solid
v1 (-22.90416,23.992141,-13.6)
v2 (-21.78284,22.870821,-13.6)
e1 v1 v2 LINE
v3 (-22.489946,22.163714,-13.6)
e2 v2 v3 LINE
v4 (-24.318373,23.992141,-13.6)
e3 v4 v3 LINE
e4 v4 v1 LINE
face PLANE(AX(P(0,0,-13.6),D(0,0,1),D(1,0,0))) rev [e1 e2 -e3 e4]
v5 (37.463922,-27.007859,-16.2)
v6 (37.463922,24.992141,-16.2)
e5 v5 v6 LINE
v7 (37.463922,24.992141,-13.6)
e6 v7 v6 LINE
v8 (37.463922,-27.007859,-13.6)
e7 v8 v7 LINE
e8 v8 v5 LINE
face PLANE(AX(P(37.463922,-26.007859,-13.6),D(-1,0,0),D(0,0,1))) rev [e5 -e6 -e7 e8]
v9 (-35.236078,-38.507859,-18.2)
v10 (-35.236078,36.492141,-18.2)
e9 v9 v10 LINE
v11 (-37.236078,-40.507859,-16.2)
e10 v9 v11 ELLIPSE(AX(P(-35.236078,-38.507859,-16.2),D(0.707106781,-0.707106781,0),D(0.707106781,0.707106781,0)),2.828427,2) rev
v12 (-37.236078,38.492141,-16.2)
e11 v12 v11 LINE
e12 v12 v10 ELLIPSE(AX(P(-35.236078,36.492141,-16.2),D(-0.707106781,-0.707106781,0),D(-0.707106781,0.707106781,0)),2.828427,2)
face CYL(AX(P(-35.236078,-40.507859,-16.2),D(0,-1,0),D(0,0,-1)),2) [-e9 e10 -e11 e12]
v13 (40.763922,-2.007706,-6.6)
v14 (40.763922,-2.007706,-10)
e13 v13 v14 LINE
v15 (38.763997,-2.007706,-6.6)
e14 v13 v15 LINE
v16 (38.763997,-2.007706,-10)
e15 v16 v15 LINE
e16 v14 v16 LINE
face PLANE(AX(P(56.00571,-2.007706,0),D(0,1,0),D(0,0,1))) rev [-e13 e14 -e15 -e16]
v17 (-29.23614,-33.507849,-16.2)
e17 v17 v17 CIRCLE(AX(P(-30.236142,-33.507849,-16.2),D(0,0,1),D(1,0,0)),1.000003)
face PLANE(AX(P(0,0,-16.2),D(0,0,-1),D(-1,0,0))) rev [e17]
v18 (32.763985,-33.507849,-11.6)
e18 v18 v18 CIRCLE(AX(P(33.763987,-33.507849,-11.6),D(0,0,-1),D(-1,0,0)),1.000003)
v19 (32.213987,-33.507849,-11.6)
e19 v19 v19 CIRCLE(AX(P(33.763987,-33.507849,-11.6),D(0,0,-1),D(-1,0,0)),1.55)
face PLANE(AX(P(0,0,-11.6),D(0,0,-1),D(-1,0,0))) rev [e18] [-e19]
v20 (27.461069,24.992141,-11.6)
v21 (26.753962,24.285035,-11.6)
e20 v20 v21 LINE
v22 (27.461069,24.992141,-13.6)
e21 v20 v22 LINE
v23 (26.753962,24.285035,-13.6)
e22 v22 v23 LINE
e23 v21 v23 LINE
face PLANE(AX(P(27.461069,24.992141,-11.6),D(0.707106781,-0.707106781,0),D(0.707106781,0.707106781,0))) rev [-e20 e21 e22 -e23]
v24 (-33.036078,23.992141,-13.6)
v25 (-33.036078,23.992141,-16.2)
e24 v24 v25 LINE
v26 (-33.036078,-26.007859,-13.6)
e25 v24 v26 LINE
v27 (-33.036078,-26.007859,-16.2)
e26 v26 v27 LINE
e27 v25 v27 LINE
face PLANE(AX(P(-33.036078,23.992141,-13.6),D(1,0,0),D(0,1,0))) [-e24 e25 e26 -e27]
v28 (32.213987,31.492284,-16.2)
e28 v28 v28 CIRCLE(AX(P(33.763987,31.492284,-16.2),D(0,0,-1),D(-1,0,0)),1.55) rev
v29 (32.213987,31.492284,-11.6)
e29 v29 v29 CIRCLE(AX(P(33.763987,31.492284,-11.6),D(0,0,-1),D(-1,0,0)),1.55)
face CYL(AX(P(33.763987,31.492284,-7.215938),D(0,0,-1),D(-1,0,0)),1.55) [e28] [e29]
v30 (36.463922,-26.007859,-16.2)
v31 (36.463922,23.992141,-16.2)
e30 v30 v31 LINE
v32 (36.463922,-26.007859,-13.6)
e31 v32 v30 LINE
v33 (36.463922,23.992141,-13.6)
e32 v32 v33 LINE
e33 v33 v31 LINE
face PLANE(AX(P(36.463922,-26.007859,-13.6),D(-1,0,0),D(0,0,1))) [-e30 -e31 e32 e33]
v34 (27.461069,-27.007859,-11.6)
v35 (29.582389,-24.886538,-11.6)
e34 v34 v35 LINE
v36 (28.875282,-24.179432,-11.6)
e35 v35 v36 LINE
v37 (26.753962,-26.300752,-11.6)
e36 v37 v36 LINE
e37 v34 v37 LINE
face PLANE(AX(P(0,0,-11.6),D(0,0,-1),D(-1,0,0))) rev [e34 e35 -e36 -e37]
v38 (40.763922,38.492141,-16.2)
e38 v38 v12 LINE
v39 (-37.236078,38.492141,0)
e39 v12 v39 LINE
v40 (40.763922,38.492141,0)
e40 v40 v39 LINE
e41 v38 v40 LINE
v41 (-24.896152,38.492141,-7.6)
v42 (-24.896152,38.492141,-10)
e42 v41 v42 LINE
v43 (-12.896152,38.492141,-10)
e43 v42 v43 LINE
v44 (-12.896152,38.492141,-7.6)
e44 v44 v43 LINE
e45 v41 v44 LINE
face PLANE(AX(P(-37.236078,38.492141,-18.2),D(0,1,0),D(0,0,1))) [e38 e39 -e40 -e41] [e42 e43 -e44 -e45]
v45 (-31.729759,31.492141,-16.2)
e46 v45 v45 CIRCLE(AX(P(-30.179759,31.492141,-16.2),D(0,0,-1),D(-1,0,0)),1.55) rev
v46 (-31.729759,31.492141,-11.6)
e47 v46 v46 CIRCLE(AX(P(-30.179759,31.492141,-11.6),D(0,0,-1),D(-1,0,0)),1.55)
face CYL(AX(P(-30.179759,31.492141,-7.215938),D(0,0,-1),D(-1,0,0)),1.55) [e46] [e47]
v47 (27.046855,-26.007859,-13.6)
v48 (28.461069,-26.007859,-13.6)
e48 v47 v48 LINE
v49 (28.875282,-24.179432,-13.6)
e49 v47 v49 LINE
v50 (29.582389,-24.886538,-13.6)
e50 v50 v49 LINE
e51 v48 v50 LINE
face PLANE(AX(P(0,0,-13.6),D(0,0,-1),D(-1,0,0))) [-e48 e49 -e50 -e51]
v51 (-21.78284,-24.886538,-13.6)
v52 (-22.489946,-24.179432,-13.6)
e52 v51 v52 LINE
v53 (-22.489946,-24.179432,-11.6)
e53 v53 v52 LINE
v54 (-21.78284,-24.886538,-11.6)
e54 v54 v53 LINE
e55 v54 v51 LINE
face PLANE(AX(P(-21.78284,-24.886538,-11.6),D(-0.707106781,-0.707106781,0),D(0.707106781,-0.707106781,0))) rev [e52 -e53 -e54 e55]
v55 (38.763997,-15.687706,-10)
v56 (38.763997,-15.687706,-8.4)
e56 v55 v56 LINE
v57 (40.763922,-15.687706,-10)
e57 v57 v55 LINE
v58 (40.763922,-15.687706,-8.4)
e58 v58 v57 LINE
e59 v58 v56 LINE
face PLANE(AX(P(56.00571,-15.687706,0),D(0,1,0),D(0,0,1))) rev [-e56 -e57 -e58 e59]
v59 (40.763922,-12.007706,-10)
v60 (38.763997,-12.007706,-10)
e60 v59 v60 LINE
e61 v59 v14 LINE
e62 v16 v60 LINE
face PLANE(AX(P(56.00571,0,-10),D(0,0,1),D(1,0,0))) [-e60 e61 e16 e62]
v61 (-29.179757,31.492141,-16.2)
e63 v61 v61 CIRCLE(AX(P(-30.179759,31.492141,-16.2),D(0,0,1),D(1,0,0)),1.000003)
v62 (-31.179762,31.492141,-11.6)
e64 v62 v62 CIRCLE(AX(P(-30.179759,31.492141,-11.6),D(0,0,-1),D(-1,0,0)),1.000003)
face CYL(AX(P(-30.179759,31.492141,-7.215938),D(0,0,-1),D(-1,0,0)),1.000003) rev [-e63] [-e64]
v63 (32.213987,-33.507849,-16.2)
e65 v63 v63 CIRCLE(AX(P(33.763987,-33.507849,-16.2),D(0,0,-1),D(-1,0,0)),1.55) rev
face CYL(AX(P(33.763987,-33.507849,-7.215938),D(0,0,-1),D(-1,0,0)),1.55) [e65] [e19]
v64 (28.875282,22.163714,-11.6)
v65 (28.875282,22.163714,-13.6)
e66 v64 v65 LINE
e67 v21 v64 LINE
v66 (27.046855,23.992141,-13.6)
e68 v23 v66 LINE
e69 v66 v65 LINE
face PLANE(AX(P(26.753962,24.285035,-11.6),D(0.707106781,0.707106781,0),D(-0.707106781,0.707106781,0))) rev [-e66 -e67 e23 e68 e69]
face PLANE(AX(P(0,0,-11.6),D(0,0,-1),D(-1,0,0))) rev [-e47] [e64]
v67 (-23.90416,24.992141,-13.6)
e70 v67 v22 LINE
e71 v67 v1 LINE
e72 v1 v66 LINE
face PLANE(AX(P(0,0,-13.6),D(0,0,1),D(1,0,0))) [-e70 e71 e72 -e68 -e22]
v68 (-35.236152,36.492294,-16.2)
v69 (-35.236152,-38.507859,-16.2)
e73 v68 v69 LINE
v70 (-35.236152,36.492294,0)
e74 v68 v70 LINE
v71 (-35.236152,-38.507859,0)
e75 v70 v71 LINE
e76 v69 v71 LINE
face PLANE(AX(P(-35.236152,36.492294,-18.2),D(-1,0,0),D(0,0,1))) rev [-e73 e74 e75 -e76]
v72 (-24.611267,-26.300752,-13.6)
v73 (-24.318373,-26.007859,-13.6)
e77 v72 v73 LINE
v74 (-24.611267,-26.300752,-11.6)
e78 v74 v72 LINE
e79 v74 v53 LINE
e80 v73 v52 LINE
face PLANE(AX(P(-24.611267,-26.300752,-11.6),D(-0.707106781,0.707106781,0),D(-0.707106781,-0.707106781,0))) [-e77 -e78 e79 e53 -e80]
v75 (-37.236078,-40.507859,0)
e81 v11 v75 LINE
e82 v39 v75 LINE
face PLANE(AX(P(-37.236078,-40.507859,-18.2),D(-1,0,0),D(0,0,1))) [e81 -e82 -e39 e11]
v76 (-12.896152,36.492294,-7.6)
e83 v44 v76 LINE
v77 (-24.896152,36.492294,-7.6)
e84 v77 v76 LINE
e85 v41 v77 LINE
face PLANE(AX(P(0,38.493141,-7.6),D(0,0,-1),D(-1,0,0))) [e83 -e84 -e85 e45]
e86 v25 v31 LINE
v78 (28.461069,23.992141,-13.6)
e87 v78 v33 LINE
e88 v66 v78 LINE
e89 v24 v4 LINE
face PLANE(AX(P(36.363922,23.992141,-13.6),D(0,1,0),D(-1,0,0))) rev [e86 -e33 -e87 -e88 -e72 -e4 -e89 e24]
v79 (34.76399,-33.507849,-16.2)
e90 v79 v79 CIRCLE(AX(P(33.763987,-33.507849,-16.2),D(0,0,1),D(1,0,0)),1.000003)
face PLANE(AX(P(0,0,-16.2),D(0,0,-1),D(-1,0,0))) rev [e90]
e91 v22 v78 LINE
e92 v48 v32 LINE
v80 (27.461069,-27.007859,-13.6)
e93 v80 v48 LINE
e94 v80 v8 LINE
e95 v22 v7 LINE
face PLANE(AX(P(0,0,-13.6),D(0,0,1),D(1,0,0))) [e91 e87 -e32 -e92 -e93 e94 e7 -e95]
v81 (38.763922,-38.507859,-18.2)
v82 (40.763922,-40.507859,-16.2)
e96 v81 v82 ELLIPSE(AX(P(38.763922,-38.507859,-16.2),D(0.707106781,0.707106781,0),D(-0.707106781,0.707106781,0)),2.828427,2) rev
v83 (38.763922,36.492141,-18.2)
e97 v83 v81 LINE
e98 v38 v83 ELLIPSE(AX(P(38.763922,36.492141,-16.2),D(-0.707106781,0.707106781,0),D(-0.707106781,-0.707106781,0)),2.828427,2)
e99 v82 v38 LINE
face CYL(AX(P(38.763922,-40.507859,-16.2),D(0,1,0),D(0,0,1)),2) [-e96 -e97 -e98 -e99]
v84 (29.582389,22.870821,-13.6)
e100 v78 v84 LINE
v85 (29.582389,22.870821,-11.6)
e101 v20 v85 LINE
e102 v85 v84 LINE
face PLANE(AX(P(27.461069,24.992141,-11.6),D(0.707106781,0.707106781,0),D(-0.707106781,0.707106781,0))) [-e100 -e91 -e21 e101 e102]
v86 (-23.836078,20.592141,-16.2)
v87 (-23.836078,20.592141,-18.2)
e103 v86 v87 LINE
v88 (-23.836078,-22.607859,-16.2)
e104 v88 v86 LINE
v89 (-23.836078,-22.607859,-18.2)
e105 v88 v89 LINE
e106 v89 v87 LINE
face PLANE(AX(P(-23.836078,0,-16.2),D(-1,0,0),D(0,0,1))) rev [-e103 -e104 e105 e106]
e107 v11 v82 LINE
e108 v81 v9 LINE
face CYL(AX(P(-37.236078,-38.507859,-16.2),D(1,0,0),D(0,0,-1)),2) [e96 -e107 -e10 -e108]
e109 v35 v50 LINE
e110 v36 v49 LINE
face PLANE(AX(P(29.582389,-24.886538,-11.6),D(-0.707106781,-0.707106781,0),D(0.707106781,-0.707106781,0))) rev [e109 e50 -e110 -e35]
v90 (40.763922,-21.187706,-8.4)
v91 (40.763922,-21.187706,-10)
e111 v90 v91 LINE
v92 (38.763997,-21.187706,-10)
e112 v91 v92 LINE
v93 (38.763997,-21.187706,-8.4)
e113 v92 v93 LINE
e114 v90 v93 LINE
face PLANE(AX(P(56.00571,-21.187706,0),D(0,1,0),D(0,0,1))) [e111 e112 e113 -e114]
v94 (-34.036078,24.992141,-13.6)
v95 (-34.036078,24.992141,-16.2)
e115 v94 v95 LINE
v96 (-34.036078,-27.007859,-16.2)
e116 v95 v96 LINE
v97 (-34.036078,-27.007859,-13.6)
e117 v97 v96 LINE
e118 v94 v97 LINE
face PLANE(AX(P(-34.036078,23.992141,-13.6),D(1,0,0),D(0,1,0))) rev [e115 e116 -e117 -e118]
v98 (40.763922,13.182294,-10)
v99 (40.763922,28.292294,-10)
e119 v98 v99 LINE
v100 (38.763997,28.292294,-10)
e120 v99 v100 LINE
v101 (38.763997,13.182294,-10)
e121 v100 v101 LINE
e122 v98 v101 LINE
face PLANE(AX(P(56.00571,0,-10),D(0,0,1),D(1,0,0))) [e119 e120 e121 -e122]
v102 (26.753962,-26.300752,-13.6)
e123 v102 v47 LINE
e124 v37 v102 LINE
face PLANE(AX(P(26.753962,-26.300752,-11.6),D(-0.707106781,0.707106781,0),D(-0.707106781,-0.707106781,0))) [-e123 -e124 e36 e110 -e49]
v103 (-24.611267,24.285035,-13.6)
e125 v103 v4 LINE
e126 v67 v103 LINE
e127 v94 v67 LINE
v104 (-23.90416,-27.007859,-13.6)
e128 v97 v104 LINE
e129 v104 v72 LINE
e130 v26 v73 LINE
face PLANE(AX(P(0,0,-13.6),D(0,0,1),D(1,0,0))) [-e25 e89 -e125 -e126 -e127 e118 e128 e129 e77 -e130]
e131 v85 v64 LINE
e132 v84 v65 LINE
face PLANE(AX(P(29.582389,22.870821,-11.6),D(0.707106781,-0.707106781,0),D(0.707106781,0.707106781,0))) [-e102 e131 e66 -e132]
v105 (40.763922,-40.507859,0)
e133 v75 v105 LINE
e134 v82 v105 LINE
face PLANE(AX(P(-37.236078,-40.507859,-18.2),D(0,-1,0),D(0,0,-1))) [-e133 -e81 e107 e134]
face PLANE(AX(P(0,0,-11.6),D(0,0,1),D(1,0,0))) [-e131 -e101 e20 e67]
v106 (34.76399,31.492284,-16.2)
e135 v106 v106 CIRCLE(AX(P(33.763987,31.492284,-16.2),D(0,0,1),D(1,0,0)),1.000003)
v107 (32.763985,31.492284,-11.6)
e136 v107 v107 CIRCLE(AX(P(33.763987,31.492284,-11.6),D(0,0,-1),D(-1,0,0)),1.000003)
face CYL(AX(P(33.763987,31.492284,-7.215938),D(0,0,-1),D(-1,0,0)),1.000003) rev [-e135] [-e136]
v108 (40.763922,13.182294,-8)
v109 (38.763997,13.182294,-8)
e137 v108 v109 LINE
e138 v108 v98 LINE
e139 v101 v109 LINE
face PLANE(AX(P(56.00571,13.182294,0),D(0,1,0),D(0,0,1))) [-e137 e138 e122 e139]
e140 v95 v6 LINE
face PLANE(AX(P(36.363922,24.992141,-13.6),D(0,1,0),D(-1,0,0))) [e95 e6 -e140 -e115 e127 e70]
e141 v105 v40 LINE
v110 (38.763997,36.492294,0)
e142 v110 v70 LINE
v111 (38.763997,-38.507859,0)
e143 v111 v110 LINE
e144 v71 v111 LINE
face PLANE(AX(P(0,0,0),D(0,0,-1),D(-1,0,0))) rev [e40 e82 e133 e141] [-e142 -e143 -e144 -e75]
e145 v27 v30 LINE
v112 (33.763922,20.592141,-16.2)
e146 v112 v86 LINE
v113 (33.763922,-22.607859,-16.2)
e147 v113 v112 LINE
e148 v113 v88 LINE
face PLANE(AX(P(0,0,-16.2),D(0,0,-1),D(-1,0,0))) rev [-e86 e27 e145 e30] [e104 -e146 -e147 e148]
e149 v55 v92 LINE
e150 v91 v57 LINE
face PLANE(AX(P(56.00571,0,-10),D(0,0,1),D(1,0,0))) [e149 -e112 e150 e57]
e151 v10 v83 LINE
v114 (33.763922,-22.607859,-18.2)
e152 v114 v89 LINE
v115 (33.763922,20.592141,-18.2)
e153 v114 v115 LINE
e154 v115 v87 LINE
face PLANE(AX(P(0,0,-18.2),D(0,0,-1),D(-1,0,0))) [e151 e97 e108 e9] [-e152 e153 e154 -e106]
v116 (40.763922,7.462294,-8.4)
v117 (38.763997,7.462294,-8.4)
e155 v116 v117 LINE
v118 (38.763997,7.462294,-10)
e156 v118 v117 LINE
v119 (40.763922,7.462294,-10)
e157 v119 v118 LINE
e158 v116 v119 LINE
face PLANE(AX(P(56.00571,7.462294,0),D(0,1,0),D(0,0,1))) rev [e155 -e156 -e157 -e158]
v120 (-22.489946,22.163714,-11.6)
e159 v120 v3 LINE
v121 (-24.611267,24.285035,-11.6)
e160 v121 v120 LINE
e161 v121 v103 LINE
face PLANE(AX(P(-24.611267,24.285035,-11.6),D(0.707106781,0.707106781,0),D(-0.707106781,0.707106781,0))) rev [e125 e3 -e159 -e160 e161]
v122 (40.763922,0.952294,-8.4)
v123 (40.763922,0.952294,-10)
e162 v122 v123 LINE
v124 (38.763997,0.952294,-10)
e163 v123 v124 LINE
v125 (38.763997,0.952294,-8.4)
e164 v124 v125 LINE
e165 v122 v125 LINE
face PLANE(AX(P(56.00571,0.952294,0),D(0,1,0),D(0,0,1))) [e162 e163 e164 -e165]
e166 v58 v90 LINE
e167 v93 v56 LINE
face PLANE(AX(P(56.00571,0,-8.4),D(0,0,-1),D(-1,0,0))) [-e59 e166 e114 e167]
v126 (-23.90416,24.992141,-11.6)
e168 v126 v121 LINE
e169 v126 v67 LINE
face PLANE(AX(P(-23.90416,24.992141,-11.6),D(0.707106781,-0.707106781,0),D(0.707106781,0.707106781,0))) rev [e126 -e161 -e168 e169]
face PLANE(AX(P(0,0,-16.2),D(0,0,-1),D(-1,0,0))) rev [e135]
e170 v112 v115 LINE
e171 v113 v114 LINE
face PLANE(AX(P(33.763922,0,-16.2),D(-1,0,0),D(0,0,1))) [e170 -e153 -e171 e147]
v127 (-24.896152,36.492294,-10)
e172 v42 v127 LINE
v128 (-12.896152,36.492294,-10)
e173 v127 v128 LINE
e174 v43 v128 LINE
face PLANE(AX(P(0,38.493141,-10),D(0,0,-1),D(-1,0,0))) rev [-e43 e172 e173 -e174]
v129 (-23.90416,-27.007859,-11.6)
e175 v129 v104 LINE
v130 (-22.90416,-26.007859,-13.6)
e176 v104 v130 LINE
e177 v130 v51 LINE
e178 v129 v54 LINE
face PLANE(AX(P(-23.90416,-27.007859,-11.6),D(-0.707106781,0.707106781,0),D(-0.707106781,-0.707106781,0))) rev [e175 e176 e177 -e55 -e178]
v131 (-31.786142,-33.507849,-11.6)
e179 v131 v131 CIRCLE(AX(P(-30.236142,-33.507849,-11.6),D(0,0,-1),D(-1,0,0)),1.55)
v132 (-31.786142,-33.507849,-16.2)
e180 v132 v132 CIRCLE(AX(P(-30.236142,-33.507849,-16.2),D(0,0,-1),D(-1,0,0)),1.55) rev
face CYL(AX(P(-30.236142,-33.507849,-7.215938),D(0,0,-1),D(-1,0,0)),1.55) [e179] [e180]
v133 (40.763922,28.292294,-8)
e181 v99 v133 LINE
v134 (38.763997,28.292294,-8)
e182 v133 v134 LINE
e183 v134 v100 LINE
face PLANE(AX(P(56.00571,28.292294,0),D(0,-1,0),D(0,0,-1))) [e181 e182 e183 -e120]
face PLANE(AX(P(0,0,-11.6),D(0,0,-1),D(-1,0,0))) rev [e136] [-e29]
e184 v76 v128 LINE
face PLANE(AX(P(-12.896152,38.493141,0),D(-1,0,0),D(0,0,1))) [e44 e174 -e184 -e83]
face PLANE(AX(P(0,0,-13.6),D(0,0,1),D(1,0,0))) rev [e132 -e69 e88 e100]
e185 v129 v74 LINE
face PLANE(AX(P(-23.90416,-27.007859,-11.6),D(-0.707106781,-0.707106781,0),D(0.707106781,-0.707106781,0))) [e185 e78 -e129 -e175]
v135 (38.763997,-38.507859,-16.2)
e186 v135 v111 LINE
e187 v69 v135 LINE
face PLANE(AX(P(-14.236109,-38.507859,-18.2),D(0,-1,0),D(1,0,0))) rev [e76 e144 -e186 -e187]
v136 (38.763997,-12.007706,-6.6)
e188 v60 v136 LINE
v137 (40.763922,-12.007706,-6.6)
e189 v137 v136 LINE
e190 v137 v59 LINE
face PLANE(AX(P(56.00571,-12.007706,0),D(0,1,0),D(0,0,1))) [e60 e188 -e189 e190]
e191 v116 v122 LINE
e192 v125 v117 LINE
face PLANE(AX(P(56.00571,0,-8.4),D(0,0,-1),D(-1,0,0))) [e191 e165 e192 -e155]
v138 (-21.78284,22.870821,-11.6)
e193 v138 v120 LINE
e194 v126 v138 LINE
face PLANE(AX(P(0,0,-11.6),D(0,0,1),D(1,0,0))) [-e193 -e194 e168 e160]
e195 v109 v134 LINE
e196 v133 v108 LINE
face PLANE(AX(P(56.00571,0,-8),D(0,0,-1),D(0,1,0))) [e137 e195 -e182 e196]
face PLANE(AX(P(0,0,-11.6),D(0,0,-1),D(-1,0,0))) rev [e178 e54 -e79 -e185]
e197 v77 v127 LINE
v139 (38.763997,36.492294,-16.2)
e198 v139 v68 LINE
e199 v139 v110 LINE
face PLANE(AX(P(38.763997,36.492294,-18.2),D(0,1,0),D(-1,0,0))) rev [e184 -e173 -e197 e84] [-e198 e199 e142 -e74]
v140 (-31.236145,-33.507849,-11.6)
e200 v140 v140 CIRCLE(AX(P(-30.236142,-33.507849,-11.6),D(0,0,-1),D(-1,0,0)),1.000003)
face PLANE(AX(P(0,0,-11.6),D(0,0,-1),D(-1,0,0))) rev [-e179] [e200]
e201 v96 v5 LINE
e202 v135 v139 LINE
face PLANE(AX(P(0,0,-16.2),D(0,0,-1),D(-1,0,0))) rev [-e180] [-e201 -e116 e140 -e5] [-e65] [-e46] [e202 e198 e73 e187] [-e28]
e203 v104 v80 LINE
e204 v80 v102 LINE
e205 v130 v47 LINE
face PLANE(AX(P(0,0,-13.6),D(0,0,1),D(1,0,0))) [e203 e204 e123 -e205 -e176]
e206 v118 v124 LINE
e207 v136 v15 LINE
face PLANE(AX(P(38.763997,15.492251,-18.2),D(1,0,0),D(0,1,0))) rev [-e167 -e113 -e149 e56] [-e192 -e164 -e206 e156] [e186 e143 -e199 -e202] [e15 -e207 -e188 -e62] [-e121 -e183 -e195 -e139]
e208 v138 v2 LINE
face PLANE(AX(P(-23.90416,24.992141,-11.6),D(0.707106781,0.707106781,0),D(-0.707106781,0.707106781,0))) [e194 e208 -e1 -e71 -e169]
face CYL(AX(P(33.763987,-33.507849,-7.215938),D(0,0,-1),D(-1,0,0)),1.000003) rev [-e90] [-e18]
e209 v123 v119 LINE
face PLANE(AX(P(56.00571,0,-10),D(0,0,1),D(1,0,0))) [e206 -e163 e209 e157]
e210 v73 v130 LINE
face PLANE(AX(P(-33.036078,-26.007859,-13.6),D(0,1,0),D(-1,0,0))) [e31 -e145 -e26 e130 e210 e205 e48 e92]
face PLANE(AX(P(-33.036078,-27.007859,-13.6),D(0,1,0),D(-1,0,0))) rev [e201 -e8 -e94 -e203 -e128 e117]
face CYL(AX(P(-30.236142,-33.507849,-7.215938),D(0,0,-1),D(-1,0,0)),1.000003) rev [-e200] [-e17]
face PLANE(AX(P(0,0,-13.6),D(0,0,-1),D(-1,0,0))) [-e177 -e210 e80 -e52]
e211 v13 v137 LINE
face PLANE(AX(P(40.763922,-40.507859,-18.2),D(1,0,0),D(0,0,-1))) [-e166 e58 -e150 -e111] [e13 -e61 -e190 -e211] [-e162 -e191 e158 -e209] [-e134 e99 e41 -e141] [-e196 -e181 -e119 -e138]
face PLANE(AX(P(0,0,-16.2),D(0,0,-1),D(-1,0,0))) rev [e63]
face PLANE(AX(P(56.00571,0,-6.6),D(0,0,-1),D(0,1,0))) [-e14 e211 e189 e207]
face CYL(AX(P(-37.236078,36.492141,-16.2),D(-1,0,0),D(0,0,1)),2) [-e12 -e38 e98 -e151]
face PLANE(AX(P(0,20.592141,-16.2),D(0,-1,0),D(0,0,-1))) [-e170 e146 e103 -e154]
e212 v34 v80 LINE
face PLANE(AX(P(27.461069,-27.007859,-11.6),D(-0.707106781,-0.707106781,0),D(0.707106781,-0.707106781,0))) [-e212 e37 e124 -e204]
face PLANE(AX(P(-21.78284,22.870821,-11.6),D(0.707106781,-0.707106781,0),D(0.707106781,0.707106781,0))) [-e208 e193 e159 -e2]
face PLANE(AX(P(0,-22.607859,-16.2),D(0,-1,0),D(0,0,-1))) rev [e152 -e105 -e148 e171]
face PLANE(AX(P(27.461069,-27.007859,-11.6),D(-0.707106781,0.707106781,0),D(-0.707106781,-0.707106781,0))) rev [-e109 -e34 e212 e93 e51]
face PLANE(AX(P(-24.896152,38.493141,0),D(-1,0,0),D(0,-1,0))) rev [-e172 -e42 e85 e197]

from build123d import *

# Parameters (mm, degrees)
SKETCH_876_W           = 78
SKETCH_876_H           = 79
EXTRUDE_1660_DEPTH     = 18.2
SKETCH_1708_W          = 74.00014986
SKETCH_1708_H          = 75.0001524
SKETCH_1708_W_2        = 69.2
SKETCH_1708_H_2        = 50
SKETCH_1708_W_3        = 57.6
SKETCH_1708_H_3        = 43.2
LCD_DEPTH              = 2
LCD_2_OUTLINE_W        = 71.5
LCD_2_OUTLINE_H        = 52
LCD_2_OUTLINE_W_2      = 69.5
LCD_2_OUTLINE_H_2      = 50
LCD_2_DEPTH            = 2.6
LCD_3_DEPTH            = 2
SKETCH_9_R             = 1.55
SKETCH_9_R_2           = 1.00000254
PCB_DEPTH              = 4.6
USB_START              = 74.00015
SKETCH_11_W            = 1.6
SKETCH_11_H            = 5.5
SKETCH_11_W_2          = 3.4
SKETCH_11_H_2          = 10
SKETCH_11_W_3          = 2
SKETCH_11_H_3          = 15.11
SKETCH_11_H_4          = 6.51
USB_DEPTH              = 1.999925
CUT_EXTRUDE_7042_REACH = 91.005
SKETCH_12_W            = 12
SKETCH_12_H            = 2.4
FILLET_1_R             = 2


# Read off the part's stored shape, not the designer's step: LCD边框
with BuildPart() as part:
    # Sketch 876 → Extrude 1660 (new body)
    with BuildSketch(Plane.XY):
        with Locations((1.76392246, -1.007858704)):
            Rectangle(SKETCH_876_W, SKETCH_876_H)
        Polygon((-17.23611691, -38.507858704), (-14.23610929, -38.507858704), (38.76399739, -38.507858704), (38.76399739, -20.507823144), (38.76399739, 15.492250516), (38.76399739, 36.492293696), (-35.23615247, 36.492293696), (-35.23615247, -38.507858704), align=None, mode=Mode.SUBTRACT)
    extrude(amount=-EXTRUDE_1660_DEPTH)

    # Sketch 1708 → LCD (add)
    # profile 1 of 2: a face of its own
    with BuildSketch(Plane(origin=(0, 0, -18.2), x_dir=(-1, 0, 0), z_dir=(0, 0, -1))):
        with Locations((-1.76392246, -1.007782504)):
            Rectangle(SKETCH_1708_W, SKETCH_1708_H)
        with Locations((-1.76392246, -1.007858704)):
            Rectangle(SKETCH_1708_W_2, SKETCH_1708_H_2, mode=Mode.SUBTRACT)
    # profile 2 of 2: a face of its own
    with BuildSketch(Plane(origin=(0, 0, -18.2), x_dir=(-1, 0, 0), z_dir=(0, 0, -1))):
        with Locations((-1.76392246, -1.007858704)):
            Rectangle(SKETCH_1708_W_2, SKETCH_1708_H_2)
        with Locations((-4.96392246, -1.007858704)):
            Rectangle(SKETCH_1708_W_3, SKETCH_1708_H_3, mode=Mode.SUBTRACT)
    extrude(amount=-LCD_DEPTH)

    # LCD 2 outline → LCD 2 (add)
    with BuildSketch(Plane.XY.offset(-16.2)):
        with Locations((1.71392246, -1.007858704)):
            Rectangle(LCD_2_OUTLINE_W, LCD_2_OUTLINE_H)
        with Locations((1.71392246, -1.007858704)):
            Rectangle(LCD_2_OUTLINE_W_2, LCD_2_OUTLINE_H_2, mode=Mode.SUBTRACT)
    extrude(amount=LCD_2_DEPTH)

    # 草图7 → LCD 3 (add)
    with BuildSketch(Plane.XY.offset(-13.6)):
        Polygon((-23.904159925, -27.007858704), (-21.782839581, -24.886538361), (-22.489946362, -24.17943158), (-24.611266706, -26.300751923), align=None)
        Polygon((27.461068732, -27.007858704), (29.582389075, -24.886538361), (28.875282294, -24.17943158), (26.75396195, -26.300751923), align=None)
        Polygon((26.75396195, 24.285034514), (28.875282294, 22.163714171), (29.582389075, 22.870820952), (27.461068732, 24.992141296), align=None)
        Polygon((-24.611266706, 24.285034514), (-22.489946362, 22.163714171), (-21.782839581, 22.870820952), (-23.904159925, 24.992141296), align=None)
    extrude(amount=LCD_3_DEPTH)

    # 草图9 → PCB螺丝位 (add)
    # profile 1 of 4: a face of its own
    with BuildSketch(Plane.XY.offset(-16.2)):
        with Locations(Location((-30.179759278, 31.492141296, 0), (0, 0, 180))):
            Circle(SKETCH_9_R)
        with Locations(Location((-30.179759278, 31.492141296, 0), (0, 0, 180))):
            Circle(SKETCH_9_R_2, mode=Mode.SUBTRACT)
    # profile 2 of 4: a face of its own
    with BuildSketch(Plane.XY.offset(-16.2)):
        with Locations(Location((33.76398723, 31.492283536, 0), (0, 0, 180))):
            Circle(SKETCH_9_R)
        with Locations(Location((33.76398723, 31.492283536, 0), (0, 0, 180))):
            Circle(SKETCH_9_R_2, mode=Mode.SUBTRACT)
    # profile 3 of 4: a face of its own
    with BuildSketch(Plane.XY.offset(-16.2)):
        with Locations(Location((33.76398723, -33.507848544, 0), (0, 0, 180))):
            Circle(SKETCH_9_R)
        with Locations(Location((33.76398723, -33.507848544, 0), (0, 0, 180))):
            Circle(SKETCH_9_R_2, mode=Mode.SUBTRACT)
    # profile 4 of 4: a face of its own
    with BuildSketch(Plane.XY.offset(-16.2)):
        with Locations(Location((-30.23614231, -33.507848544, 0), (0, 0, 180))):
            Circle(SKETCH_9_R)
        with Locations(Location((-30.23614231, -33.507848544, 0), (0, 0, 180))):
            Circle(SKETCH_9_R_2, mode=Mode.SUBTRACT)
    extrude(amount=PCB_DEPTH)

    # 草图11 → 切除-USB边 (cut)
    with BuildSketch(Plane(origin=(-35.23615247, 0, 0), x_dir=(0, 0, -1), z_dir=(1, 0, 0)).offset(USB_START)):
        with Locations((9.2, -18.437706304)):
            Rectangle(SKETCH_11_W, SKETCH_11_H)
        with Locations((8.3, -7.007706304)):
            Rectangle(SKETCH_11_W_2, SKETCH_11_H_2)
        with Locations((9, 20.737293696)):
            Rectangle(SKETCH_11_W_3, SKETCH_11_H_3)
        with Locations((9.2, 4.207293696)):
            Rectangle(SKETCH_11_W, SKETCH_11_H_4)
    extrude(amount=USB_DEPTH, mode=Mode.SUBTRACT)

    # 草图12 → Cut-Extrude 7042 (cut, up to next)
    with BuildSketch(Plane.XZ.offset(-36.492293696), mode=Mode.PRIVATE) as cut_extrude_7042_sk1:
        with Locations((-18.89615247, -8.8)):
            Rectangle(SKETCH_12_W, SKETCH_12_H)
    cut_extrude_7042_tool1 = extrude(cut_extrude_7042_sk1.sketch, amount=-CUT_EXTRUDE_7042_REACH, mode=Mode.PRIVATE) & part.part
    add(cut_extrude_7042_tool1.solids().sort_by_distance((-18.896152, 36.492294, -8.8))[0], mode=Mode.SUBTRACT)

    # 圆角1
    fillet_1_edges = [part.edges().sort_by_distance(p)[0] for p in [
        (-37.23607754, -1.007858704, -18.2),
        (1.76392246, -40.507858704, -18.2),
        (40.76392246, -1.007858704, -18.2),
        (1.76392246, 38.492141296, -18.2),
    ]]
    fillet(fillet_1_edges, radius=FILLET_1_R)


solid = part.part
